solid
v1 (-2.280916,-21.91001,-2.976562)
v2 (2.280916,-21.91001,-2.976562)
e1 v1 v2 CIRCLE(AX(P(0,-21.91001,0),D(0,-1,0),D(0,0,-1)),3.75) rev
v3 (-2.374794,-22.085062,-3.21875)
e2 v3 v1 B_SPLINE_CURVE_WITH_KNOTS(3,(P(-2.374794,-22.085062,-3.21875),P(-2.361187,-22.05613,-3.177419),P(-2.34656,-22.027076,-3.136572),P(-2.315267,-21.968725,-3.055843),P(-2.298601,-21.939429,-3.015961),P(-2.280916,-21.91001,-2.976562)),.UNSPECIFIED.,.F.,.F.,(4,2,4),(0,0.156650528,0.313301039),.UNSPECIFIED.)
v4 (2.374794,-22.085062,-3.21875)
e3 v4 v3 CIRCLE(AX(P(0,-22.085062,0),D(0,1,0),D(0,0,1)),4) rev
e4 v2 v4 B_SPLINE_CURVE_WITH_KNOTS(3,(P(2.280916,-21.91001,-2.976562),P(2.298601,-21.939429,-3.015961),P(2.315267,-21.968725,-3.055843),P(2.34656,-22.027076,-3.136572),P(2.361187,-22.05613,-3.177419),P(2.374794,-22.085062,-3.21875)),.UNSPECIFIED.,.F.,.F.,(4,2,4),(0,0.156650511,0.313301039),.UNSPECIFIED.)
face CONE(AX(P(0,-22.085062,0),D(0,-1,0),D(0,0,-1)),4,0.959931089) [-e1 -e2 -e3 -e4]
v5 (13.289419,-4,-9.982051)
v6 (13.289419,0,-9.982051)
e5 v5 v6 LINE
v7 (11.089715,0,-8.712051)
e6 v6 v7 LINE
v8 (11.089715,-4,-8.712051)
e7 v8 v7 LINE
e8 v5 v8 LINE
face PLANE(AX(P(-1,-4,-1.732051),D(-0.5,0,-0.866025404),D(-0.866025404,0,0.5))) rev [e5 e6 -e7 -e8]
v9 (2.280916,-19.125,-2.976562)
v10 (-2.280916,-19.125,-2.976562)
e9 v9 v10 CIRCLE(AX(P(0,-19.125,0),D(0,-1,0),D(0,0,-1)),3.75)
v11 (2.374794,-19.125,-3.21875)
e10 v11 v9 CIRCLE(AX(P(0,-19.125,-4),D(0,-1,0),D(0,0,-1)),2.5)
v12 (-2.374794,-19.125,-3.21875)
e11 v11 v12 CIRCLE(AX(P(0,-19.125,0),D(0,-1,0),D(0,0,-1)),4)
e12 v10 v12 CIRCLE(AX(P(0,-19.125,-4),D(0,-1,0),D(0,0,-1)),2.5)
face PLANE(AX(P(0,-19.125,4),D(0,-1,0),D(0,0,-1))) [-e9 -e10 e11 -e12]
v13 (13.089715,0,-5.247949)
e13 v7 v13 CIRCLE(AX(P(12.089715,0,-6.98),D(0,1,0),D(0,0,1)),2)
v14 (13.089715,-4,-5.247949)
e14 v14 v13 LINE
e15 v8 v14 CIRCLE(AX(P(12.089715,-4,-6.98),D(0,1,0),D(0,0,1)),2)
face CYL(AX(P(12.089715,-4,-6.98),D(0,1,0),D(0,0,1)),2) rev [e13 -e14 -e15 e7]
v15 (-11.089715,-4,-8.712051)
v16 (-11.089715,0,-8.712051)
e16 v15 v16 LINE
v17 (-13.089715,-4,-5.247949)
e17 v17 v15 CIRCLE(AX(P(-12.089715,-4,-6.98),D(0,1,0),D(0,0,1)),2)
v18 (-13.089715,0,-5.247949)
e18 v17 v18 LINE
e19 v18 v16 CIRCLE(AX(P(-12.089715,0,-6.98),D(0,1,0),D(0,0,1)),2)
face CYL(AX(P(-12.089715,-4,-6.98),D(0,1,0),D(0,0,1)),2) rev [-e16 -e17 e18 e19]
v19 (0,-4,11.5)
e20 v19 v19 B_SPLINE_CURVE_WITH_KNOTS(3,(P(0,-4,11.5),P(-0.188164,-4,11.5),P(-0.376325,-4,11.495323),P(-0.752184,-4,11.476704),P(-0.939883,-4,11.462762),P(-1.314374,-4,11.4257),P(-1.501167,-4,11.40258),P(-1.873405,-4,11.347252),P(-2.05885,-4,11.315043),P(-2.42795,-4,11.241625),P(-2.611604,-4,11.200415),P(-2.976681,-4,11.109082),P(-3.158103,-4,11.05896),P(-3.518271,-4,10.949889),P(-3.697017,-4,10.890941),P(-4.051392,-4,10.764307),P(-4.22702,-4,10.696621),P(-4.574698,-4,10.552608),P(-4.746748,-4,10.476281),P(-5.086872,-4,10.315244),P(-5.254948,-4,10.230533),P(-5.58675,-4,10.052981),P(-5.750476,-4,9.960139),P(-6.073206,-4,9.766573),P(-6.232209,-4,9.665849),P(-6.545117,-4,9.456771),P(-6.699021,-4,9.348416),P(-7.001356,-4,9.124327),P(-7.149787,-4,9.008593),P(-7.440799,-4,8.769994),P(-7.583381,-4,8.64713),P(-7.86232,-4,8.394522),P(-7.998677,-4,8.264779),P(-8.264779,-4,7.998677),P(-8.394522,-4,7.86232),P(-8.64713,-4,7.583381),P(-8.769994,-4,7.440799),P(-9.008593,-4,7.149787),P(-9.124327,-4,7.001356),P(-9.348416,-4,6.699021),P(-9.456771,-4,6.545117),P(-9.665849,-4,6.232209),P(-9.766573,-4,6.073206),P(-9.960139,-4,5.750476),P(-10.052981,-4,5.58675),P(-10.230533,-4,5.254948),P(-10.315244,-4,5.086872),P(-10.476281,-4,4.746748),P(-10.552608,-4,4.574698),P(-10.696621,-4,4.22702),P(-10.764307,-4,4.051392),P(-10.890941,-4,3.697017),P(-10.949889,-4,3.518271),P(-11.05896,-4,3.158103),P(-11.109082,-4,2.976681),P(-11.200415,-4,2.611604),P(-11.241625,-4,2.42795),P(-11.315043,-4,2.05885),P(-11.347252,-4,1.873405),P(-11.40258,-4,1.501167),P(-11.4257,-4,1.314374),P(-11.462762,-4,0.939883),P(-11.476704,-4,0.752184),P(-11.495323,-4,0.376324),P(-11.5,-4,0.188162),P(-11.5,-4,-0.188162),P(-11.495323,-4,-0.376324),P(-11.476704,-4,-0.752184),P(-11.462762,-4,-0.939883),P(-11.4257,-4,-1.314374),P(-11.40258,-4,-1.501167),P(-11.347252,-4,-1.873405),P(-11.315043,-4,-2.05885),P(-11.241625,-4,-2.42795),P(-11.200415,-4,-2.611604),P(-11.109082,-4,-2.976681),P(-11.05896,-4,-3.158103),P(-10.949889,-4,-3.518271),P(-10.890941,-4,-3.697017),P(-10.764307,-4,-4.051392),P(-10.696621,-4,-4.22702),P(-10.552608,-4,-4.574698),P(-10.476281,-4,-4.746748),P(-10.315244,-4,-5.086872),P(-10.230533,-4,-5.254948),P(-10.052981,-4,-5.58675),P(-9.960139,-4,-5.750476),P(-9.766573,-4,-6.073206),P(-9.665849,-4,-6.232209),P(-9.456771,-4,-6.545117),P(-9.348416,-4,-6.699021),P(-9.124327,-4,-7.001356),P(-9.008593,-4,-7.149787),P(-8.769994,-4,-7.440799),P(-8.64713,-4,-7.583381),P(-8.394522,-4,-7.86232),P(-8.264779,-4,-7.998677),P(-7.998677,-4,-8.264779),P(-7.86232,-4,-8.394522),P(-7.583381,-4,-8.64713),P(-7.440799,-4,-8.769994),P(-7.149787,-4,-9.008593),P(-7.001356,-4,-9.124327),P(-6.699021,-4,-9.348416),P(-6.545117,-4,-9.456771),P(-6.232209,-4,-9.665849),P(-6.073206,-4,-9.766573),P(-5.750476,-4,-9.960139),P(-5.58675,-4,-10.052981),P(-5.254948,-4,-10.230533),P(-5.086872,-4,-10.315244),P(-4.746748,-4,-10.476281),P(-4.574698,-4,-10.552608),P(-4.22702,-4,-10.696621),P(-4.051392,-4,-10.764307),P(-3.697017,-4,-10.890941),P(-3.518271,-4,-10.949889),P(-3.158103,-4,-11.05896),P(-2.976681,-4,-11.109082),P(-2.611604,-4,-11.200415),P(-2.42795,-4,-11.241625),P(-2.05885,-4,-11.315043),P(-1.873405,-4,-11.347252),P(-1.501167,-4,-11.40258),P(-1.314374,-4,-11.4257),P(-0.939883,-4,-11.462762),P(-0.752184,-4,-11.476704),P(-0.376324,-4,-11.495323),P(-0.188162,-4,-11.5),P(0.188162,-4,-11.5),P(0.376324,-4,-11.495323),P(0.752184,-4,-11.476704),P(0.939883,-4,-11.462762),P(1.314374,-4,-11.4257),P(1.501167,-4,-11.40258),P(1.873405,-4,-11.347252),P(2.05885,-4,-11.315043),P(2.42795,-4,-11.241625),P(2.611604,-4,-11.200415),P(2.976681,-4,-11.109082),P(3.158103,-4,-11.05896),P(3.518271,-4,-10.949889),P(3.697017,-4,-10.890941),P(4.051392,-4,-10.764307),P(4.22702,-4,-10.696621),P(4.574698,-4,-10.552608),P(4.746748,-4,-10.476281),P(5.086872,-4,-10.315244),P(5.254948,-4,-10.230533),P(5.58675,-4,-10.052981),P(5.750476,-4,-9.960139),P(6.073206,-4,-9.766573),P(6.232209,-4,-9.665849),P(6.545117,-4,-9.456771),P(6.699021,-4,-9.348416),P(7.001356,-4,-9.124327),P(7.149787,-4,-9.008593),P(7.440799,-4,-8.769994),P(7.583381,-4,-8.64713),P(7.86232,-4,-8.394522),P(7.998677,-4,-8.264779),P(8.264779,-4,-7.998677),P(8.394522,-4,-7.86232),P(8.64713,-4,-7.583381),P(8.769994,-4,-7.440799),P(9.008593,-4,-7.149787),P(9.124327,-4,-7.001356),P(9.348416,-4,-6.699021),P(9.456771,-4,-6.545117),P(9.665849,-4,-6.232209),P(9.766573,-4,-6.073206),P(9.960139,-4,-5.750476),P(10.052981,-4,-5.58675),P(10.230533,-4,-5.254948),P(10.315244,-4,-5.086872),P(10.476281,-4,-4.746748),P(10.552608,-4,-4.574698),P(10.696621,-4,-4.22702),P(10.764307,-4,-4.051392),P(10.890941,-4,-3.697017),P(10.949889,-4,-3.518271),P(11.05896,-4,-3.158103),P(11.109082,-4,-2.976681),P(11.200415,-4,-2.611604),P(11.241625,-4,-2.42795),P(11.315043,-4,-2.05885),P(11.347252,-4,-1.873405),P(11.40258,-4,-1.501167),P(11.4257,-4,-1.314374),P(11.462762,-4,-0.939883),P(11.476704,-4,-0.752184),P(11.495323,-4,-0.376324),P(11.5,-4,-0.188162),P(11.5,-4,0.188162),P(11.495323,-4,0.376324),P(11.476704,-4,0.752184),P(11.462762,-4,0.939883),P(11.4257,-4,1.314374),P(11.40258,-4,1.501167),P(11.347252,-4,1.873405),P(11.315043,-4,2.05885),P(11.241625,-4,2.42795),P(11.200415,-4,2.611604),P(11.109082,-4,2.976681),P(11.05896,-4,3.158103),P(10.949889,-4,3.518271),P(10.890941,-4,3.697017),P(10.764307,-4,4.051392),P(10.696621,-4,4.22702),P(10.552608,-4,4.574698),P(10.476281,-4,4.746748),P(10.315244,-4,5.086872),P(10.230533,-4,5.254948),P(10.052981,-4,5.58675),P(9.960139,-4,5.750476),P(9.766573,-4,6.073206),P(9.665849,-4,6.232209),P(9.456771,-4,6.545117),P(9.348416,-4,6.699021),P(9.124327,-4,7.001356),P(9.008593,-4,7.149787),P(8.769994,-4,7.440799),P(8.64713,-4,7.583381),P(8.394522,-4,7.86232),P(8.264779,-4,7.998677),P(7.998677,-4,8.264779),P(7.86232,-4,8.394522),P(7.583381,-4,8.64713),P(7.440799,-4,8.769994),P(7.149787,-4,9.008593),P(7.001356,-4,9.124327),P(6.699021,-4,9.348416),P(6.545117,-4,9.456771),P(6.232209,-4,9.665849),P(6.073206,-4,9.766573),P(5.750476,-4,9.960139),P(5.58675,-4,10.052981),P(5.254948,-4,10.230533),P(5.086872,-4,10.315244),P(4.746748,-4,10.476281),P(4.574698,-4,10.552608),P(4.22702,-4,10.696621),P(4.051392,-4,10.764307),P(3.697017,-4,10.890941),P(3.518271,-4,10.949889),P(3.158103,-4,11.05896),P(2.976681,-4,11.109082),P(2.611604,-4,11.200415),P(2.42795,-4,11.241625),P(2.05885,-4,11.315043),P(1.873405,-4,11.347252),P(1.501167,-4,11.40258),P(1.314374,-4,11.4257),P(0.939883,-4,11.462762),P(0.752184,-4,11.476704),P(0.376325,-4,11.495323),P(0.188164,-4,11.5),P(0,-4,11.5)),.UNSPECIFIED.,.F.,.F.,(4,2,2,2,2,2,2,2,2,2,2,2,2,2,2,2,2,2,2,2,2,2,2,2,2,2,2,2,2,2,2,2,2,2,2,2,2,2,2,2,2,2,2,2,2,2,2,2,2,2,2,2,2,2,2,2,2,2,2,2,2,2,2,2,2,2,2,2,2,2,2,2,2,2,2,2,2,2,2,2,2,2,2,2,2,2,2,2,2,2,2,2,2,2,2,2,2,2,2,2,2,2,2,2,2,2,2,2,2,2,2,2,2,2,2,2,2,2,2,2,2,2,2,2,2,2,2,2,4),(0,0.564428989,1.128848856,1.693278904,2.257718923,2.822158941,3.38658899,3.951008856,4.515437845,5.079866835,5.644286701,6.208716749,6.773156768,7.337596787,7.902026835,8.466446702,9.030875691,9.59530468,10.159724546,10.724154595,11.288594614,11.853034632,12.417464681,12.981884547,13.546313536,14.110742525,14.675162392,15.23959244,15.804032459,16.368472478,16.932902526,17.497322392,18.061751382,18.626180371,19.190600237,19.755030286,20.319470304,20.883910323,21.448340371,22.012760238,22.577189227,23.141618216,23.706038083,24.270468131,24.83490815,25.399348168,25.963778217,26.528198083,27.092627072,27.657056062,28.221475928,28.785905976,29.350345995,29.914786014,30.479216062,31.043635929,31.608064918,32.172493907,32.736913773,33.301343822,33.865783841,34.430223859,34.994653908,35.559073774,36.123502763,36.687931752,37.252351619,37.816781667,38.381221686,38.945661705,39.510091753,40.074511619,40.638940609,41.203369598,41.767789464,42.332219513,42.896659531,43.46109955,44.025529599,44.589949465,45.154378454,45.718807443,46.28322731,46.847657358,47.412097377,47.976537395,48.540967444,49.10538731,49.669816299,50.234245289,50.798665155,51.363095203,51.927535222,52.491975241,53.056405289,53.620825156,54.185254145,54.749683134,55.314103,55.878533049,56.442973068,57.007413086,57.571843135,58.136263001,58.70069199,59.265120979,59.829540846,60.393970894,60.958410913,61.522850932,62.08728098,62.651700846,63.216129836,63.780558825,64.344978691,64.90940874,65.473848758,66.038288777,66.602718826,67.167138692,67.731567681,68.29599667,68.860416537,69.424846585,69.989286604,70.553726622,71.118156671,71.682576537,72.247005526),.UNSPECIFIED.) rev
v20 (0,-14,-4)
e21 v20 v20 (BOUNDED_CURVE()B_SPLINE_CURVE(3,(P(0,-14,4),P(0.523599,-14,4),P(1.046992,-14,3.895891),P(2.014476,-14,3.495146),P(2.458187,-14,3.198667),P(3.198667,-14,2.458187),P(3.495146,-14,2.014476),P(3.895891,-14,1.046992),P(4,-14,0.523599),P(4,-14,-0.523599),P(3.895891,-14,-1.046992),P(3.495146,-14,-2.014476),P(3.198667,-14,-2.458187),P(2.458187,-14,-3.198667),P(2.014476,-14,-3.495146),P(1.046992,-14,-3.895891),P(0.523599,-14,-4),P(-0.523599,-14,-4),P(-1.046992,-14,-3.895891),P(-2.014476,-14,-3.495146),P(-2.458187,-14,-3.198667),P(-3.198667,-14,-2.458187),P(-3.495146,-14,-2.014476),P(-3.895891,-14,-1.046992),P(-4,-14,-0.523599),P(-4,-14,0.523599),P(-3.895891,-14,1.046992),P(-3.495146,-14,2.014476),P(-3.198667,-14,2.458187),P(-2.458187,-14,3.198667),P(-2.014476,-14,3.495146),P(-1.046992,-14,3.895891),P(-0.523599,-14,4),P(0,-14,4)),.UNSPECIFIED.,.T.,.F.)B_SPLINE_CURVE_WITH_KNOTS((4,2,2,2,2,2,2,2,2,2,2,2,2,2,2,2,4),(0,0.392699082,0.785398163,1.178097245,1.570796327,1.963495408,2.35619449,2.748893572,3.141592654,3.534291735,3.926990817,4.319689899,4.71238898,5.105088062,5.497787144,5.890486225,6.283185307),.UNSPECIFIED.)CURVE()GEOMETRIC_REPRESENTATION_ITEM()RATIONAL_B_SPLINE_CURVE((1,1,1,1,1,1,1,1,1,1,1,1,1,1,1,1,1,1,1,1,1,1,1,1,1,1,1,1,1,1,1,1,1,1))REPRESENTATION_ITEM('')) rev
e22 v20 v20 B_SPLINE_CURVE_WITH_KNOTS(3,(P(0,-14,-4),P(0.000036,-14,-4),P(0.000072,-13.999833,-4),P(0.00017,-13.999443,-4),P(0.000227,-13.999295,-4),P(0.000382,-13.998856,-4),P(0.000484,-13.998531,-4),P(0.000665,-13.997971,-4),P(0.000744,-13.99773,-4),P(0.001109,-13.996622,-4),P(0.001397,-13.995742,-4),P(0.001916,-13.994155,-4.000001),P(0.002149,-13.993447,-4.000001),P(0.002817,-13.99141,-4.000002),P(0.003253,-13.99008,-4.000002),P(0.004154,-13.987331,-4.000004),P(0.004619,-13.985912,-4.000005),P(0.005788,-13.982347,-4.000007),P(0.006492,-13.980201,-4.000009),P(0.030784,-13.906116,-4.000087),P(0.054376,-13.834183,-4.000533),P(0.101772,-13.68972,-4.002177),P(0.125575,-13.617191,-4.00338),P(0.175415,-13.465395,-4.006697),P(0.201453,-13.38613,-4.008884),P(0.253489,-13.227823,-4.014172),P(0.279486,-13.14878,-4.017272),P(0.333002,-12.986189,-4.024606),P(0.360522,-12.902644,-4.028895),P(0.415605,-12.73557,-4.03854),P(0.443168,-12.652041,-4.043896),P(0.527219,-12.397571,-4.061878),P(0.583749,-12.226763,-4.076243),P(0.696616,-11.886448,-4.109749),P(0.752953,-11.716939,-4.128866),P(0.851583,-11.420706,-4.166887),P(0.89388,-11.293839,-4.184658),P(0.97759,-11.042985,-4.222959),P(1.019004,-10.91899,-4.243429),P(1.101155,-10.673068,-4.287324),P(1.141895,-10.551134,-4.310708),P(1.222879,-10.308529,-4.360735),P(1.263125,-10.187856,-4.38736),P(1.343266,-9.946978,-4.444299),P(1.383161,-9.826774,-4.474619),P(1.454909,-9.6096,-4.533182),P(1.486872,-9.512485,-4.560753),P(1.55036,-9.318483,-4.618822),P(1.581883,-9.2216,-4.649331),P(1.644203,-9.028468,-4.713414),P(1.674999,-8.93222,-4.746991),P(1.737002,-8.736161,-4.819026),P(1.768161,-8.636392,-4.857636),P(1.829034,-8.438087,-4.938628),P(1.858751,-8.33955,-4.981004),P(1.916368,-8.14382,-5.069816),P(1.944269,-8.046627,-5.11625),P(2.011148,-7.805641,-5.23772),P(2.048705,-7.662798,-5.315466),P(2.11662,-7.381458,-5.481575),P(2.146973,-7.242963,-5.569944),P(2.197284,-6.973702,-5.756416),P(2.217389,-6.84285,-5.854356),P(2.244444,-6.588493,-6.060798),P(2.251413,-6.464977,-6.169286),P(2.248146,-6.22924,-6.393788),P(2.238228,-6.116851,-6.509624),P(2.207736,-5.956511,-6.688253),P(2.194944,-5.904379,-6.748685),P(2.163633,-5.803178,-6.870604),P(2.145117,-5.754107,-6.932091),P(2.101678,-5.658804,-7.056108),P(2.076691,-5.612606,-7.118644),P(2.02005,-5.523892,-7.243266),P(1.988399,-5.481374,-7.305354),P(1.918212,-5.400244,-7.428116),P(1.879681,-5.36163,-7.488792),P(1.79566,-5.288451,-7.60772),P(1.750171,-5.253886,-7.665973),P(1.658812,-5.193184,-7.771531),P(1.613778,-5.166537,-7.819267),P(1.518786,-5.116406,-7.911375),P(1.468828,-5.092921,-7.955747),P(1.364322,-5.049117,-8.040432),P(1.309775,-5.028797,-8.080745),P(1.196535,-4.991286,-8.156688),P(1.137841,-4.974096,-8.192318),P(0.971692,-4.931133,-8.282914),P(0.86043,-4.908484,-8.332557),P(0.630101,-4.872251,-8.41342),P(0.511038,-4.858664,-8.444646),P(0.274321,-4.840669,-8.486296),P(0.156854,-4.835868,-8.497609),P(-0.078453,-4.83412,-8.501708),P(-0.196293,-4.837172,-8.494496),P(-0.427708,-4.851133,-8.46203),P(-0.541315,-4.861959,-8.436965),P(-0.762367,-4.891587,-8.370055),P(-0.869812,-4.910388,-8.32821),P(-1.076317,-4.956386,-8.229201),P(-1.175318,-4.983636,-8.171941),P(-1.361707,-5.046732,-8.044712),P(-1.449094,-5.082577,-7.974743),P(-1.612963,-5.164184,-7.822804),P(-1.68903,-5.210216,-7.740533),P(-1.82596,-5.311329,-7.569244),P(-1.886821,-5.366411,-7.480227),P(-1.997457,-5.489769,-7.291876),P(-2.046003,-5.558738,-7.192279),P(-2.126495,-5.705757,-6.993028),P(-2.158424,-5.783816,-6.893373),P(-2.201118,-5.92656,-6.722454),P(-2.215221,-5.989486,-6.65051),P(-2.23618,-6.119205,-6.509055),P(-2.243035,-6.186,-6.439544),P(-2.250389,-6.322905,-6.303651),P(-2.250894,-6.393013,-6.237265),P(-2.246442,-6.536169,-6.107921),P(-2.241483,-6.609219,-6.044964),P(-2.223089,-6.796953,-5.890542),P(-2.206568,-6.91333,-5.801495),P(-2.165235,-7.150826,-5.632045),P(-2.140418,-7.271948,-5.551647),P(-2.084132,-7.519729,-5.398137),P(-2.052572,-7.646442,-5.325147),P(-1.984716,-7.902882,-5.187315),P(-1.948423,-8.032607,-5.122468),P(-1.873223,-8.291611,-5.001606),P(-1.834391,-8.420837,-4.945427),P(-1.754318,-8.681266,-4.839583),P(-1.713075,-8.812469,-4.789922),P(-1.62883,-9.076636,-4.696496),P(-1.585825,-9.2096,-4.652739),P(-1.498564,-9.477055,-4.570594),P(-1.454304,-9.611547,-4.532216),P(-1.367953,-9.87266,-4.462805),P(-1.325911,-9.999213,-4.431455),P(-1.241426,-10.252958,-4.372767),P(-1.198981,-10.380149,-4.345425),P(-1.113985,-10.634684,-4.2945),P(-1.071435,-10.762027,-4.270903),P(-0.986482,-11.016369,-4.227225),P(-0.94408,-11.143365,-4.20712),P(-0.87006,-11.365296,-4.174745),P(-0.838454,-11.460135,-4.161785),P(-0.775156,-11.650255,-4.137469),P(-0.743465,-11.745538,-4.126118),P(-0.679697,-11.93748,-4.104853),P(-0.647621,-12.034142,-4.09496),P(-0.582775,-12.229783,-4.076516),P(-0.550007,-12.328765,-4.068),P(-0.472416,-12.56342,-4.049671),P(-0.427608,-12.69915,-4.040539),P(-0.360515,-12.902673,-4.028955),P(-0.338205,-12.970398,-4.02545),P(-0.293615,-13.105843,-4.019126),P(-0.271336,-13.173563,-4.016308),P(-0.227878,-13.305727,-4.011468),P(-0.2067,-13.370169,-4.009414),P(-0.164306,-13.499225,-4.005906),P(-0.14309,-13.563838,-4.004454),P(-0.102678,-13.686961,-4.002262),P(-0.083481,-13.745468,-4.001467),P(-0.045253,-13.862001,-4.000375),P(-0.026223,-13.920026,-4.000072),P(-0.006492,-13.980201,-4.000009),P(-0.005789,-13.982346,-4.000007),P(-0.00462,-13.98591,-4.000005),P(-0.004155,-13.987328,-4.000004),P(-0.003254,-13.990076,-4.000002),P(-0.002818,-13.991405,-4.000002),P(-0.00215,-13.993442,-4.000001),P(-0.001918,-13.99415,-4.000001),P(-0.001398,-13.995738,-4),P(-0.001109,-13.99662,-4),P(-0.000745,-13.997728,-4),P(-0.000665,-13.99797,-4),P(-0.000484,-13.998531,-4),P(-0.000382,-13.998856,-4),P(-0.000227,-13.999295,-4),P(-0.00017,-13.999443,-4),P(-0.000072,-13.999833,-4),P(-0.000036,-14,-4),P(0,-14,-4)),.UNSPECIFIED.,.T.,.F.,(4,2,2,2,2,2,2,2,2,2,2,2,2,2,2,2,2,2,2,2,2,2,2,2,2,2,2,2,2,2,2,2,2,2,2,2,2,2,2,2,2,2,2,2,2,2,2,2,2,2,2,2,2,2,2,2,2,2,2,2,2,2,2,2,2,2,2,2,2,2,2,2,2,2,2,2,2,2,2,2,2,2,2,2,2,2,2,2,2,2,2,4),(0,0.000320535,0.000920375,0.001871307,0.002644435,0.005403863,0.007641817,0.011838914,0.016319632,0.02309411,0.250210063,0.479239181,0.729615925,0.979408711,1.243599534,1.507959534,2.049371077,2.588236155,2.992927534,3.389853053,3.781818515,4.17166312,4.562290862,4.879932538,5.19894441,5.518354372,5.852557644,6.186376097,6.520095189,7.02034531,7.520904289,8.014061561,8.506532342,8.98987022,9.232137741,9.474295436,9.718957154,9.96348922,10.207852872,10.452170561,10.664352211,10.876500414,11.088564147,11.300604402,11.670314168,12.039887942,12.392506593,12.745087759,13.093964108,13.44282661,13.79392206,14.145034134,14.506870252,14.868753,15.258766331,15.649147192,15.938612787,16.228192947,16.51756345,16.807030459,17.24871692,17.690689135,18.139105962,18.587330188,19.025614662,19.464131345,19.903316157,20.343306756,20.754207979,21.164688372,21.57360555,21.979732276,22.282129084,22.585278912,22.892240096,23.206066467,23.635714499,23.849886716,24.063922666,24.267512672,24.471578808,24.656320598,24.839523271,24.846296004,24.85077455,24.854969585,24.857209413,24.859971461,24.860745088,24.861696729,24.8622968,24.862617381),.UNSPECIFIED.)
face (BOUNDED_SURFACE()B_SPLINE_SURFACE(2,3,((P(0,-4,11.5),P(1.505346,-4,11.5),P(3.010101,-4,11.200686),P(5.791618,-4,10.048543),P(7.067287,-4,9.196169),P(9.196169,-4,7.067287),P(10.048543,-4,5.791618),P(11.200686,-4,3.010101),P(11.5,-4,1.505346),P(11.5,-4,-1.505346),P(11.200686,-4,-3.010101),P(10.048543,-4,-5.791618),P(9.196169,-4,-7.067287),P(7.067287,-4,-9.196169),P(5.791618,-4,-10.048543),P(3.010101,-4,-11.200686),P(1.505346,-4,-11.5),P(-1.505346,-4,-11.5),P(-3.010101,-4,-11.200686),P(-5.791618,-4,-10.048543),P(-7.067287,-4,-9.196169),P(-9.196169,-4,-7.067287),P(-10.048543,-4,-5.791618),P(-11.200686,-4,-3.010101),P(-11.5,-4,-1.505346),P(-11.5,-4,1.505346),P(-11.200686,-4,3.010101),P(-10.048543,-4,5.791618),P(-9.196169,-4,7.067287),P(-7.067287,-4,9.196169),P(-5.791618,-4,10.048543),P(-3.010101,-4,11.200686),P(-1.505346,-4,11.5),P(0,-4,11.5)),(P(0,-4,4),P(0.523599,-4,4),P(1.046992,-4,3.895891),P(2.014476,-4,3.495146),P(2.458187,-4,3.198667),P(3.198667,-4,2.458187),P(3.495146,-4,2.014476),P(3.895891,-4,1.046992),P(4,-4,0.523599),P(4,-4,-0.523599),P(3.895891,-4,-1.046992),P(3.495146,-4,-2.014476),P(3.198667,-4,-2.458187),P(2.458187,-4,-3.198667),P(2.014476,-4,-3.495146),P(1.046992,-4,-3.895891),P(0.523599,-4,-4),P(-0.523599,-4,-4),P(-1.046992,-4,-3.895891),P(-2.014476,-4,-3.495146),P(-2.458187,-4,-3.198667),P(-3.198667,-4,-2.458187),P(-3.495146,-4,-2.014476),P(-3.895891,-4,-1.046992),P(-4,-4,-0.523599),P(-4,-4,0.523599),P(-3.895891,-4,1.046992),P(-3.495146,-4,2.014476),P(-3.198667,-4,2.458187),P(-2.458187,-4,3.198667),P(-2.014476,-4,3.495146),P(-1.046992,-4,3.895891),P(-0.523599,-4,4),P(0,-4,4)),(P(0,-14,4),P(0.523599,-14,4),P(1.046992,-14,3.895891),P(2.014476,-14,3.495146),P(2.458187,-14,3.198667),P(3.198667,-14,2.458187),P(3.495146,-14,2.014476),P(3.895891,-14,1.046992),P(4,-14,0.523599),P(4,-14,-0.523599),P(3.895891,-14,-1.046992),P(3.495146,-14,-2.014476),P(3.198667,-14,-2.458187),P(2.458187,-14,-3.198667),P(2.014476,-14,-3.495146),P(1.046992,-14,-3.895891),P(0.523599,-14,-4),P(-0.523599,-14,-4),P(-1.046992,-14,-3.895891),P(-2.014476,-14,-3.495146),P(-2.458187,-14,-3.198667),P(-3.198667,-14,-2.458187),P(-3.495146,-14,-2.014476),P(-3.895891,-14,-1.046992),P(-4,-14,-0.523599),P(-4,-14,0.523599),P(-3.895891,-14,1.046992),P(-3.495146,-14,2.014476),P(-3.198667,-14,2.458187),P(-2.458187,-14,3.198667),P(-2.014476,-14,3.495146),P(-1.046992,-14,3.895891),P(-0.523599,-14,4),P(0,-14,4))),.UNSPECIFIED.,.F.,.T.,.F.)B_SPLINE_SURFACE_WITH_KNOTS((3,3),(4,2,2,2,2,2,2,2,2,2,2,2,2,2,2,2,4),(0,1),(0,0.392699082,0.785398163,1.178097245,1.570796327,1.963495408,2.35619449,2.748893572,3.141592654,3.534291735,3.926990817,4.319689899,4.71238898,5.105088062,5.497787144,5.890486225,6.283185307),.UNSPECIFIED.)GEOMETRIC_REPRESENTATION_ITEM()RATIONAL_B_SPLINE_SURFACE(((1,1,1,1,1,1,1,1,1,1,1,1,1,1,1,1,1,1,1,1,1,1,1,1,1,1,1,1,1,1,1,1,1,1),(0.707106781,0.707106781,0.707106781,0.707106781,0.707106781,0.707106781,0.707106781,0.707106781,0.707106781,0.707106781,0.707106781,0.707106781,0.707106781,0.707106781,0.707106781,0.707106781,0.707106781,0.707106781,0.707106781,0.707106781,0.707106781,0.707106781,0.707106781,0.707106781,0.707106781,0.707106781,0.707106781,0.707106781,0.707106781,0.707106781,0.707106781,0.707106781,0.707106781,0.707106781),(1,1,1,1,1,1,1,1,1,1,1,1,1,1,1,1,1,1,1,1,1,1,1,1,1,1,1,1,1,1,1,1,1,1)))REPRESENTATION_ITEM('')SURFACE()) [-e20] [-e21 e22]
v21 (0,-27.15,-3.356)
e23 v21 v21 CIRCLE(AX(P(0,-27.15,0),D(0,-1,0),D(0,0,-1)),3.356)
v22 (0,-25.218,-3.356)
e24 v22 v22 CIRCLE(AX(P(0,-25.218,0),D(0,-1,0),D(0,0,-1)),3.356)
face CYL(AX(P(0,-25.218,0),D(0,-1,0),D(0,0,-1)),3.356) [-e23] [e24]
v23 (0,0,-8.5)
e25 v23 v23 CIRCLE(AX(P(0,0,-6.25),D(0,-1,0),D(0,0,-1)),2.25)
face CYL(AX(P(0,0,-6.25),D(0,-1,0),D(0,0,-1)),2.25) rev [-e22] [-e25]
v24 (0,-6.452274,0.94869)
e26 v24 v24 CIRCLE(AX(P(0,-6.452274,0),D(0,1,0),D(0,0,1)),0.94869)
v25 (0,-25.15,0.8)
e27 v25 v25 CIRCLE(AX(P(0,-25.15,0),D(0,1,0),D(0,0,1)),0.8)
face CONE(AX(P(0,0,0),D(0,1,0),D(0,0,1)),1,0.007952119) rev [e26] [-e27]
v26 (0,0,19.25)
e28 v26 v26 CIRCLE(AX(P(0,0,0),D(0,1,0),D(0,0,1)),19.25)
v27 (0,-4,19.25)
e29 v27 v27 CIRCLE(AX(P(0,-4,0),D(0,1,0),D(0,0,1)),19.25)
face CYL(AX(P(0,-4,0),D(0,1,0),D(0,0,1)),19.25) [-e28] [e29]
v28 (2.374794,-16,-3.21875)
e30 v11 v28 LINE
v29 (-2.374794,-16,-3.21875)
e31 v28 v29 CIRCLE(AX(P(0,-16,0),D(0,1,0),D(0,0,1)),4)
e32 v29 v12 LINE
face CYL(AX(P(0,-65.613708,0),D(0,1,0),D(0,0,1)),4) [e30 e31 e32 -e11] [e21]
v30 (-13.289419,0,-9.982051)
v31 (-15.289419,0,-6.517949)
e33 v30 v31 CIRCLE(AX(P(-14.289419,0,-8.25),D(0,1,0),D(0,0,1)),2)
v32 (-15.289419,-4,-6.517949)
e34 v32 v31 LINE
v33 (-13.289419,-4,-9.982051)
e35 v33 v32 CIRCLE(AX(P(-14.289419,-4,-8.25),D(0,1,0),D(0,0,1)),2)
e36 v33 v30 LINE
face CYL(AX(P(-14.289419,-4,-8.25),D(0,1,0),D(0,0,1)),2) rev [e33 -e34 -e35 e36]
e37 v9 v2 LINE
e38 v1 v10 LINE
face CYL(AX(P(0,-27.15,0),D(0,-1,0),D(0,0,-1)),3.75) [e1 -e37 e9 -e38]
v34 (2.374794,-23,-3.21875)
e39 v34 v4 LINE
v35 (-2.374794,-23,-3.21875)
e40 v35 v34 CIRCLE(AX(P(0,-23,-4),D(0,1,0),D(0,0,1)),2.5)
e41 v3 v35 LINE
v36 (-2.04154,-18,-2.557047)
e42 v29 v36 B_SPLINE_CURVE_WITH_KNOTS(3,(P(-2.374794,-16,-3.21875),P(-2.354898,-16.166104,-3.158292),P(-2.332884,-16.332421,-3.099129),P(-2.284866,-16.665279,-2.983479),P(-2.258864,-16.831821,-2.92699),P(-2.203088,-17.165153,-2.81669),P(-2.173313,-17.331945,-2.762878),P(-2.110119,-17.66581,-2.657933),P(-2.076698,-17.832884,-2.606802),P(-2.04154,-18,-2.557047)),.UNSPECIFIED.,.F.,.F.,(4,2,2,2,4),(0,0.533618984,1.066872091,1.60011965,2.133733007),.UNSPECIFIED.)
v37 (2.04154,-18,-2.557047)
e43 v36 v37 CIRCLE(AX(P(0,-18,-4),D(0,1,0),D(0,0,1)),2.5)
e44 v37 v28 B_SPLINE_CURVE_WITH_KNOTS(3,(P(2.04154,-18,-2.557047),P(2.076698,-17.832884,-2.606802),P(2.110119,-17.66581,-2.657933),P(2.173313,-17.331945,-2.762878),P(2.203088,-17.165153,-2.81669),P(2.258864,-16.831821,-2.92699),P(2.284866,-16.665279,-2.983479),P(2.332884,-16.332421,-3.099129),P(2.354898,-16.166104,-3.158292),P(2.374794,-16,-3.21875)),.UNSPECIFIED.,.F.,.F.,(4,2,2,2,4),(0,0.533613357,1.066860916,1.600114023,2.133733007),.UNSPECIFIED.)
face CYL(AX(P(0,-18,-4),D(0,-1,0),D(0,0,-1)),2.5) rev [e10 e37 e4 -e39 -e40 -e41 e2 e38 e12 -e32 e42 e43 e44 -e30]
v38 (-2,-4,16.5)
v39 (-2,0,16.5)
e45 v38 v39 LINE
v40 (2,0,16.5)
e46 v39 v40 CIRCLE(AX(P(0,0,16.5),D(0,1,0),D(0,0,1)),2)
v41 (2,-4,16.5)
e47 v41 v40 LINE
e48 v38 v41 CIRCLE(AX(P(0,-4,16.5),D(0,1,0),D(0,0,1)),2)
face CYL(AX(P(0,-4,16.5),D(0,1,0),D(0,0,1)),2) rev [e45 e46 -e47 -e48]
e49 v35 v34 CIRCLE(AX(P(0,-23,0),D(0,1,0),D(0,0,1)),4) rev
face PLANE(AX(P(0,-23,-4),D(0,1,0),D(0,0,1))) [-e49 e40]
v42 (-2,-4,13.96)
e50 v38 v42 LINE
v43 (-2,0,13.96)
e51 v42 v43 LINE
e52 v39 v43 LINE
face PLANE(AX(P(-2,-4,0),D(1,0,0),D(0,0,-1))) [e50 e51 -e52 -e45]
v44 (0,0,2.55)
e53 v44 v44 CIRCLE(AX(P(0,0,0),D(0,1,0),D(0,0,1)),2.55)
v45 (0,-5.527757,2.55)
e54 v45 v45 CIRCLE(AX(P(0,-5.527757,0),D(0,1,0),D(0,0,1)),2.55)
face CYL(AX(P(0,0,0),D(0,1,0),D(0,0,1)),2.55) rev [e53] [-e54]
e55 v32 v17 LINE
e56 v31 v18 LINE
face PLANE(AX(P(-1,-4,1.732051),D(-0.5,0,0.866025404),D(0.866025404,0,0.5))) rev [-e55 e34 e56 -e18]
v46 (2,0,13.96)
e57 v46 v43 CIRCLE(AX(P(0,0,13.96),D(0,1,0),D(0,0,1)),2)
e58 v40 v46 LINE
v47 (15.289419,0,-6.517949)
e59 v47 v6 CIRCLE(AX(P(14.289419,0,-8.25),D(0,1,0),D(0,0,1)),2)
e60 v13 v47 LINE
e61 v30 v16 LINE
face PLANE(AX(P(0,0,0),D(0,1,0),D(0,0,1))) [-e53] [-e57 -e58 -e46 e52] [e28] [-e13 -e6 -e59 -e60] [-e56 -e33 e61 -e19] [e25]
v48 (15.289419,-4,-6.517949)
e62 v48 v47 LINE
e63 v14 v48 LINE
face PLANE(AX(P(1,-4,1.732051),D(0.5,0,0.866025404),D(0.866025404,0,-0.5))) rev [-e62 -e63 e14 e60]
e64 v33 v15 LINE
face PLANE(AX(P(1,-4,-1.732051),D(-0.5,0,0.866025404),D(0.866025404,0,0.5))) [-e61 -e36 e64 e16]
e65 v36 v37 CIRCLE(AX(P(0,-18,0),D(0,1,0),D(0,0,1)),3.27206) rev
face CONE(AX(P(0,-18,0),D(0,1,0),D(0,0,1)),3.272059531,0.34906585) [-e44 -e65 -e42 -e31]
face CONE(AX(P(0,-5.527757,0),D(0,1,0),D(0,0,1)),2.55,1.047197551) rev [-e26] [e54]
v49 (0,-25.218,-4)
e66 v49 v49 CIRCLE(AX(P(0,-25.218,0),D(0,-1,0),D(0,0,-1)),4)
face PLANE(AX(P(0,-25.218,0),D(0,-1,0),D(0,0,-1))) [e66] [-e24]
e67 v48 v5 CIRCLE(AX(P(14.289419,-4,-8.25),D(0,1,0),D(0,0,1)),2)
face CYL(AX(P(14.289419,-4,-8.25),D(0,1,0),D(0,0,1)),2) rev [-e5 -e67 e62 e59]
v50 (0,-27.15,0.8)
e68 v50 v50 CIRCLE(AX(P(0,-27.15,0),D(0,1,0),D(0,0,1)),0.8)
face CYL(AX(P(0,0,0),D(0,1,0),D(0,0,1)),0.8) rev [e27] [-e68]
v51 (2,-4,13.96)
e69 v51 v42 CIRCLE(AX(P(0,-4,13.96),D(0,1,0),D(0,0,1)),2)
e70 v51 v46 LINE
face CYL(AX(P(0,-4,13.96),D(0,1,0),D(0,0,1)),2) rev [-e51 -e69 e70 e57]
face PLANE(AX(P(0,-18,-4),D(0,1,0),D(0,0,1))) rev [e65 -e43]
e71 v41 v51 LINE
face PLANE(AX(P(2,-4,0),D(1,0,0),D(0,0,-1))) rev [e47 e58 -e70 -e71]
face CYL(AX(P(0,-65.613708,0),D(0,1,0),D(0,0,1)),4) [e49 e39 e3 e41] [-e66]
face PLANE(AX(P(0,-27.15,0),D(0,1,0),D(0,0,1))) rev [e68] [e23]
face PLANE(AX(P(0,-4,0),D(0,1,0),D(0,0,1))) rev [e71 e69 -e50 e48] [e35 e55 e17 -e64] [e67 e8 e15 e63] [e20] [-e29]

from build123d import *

# Parameters (mm, degrees)
SKETCH1_R               = 19.25
SKETCH1_R_2             = 4
BOSS_EXTRUDE1_DEPTH     = 4
SKETCH1_4_R             = 4
BOSS_EXTRUDE2_DEPTH     = 27.15
CUT_EXTRUDE1_START      = -1.932
SKETCH6_R               = 4
SKETCH6_R_2             = 3.356
CUT_EXTRUDE1_DEPTH      = 1.932
SKETCH8_R               = 2.5
CUT_EXTRUDE3_DEPTH      = 5
CHAMFER1_SIZE           = 2
CHAMFER1_SIZE2          = 0.727940469
SKETCH9_W               = 0.25
SKETCH9_H               = 2.75
CHAMFER3_SIZE           = 0.3
CHAMFER3_SIZE_2         = 0.210062261
FILLET3_SIZE            = 10
FILLET3_SIZE_2          = 7.5
CUT_EXTRUDE2_DEPTH      = 36.735801376
CUT_EXTRUDE2_DEPTH_BACK = 36.735801376
SKETCH7_R               = 2.25


with BuildPart() as part:
    # Sketch1 → Boss-Extrude1 (new body)
    # profile 1 of 2: a face of its own
    with BuildSketch(Plane(origin=(0, 0, 0), x_dir=(1, 0, 0), z_dir=(0, 1, 0))):
        with Locations(Location((0, 0, 0), (0, 0, 270))):
            Circle(SKETCH1_R)
        with BuildLine():
            ThreePointArc((2, -16.5), (0, -18.5), (-2, -16.5))
            Line((-2, -16.5), (-2, -16.378339354))
            ThreePointArc((-2, -16.378339354), (-14.289419162, -8.25), (-15.184057953, 6.45711887))
            Line((-15.184057953, 6.45711887), (-15.289419162, 6.517949192))
            ThreePointArc((-15.289419162, 6.517949192), (-16.02146997, 9.25), (-13.289419162, 9.982050808))
            Line((-13.289419162, 9.982050808), (-13.184057953, 9.921220485))
            ThreePointArc((-13.184057953, 9.921220485), (0, 16.5), (13.184057953, 9.921220485))
            Line((13.184057953, 9.921220485), (13.289419162, 9.982050808))
            ThreePointArc((13.289419162, 9.982050808), (16.02146997, 9.25), (15.289419162, 6.517949192))
            Line((15.289419162, 6.517949192), (15.184057953, 6.45711887))
            ThreePointArc((15.184057953, 6.45711887), (16.167667677, 3.294923655), (16.5, 0))
            ThreePointArc((16.5, 0), (12.354149101, -10.937321427), (2, -16.378339354))
            Line((2, -16.378339354), (2, -16.5))
        make_face(mode=Mode.SUBTRACT)
    # profile 2 of 2: a face of its own
    with BuildSketch(Plane(origin=(0, 0, 0), x_dir=(1, 0, 0), z_dir=(0, 1, 0))):
        with BuildLine():
            ThreePointArc((-15.184057953, 6.45711887), (-14.289419162, -8.25), (-2, -16.378339354))
            Line((-2, -16.378339354), (-2, -13.96))
            ThreePointArc((-2, -13.96), (0, -11.96), (2, -13.96))
            Line((2, -13.96), (2, -16.378339354))
            ThreePointArc((2, -16.378339354), (12.354149101, -10.937321427), (16.5, 0))
            ThreePointArc((16.5, 0), (16.167667677, 3.294923655), (15.184057953, 6.45711887))
            Line((15.184057953, 6.45711887), (13.089714637, 5.247949192))
            ThreePointArc((13.089714637, 5.247949192), (10.357663829, 5.98), (11.089714637, 8.712050808))
            Line((11.089714637, 8.712050808), (13.184057953, 9.921220485))
            ThreePointArc((13.184057953, 9.921220485), (0, 16.5), (-13.184057953, 9.921220485))
            Line((-13.184057953, 9.921220485), (-11.094979939, 8.715090731))
            Line((-11.094979939, 8.715090731), (-11.089714637, 8.712050808))
            ThreePointArc((-11.089714637, 8.712050808), (-10.357663829, 5.98), (-13.089714637, 5.247949192))
            Line((-13.089714637, 5.247949192), (-15.184057953, 6.45711887))
        make_face()
        with Locations(Location((0, 0, 0), (0, 0, 270))):
            Circle(SKETCH1_R_2, mode=Mode.SUBTRACT)
    extrude(amount=-BOSS_EXTRUDE1_DEPTH)

    # Sketch1<4> → Boss-Extrude2 (add)
    with BuildSketch(Plane(origin=(0, 0, 0), x_dir=(1, 0, 0), z_dir=(0, 1, 0))):
        with Locations(Location((0, 0, 0), (0, 0, 270))):
            Circle(SKETCH1_4_R)
    extrude(amount=-BOSS_EXTRUDE2_DEPTH)

    # Sketch2 → Cut-Revolve4 (revolve, cut)
    with BuildSketch(Plane(origin=(0, 0, 0), x_dir=(0, 0, -1), z_dir=(1, 0, 0)), mode=Mode.PRIVATE) as cut_revolve4_sk:
        Polygon((0, -27.15), (0.8, -27.15), (0.8, -25.15), (1, 0), (0, 0), align=None)
    revolve(cut_revolve4_sk.sketch.rotate(Axis((0, 0, 0), (0, -1, 0)), 180), axis=Axis((0, 0, 0), (0, -1, 0)), mode=Mode.SUBTRACT)

    # Sketch5 → Cut-Revolve8 (revolve, cut)
    with BuildSketch(Plane.XY, mode=Mode.PRIVATE) as cut_revolve8_sk:
        Polygon((0, -7), (-2.55, -5.527756814), (-2.55, 0), (0, 0), align=None)
    revolve(cut_revolve8_sk.sketch.rotate(Axis((0, 0, 0), (0, -1, 0)), 270), axis=Axis((0, 0, 0), (0, -1, 0)), mode=Mode.SUBTRACT)

    # Sketch6 → Cut-Extrude1 (cut)
    with BuildSketch(Plane.XZ.offset(27.15).offset(CUT_EXTRUDE1_START)):
        with Locations(Location((0, 0, 0), (0, 0, 90))):
            Circle(SKETCH6_R)
        with Locations(Location((0, 0, 0), (0, 0, 270))):
            Circle(SKETCH6_R_2, mode=Mode.SUBTRACT)
    extrude(amount=CUT_EXTRUDE1_DEPTH, mode=Mode.SUBTRACT)

    # Sketch8 → Cut-Extrude3 (cut)
    with BuildSketch(Plane(origin=(0, -23, 0), x_dir=(1, 0, 0), z_dir=(0, 1, 0))):
        with Locations((0, 4)):
            Circle(SKETCH8_R)
    extrude(amount=CUT_EXTRUDE3_DEPTH, mode=Mode.SUBTRACT)

    # Chamfer1
    chamfer1_edges = [part.edges().sort_by_distance(p)[0] for p in [
        (0, -18, -4),
    ]]
    chamfer1_side = [part.faces().sort_by_distance(p)[0] for p in [
        (0, -14.609, -4),
    ]]
    chamfer(chamfer1_edges, length=CHAMFER1_SIZE, length2=CHAMFER1_SIZE2, reference=chamfer1_side[0])

    # Sketch9 → Cut-Revolve9 (revolve, cut)
    with BuildSketch(Plane(origin=(0, 0, 0), x_dir=(0, 0, -1), z_dir=(1, 0, 0)), mode=Mode.PRIVATE) as cut_revolve9_sk:
        with Locations((-3.875, -20.5)):
            Rectangle(SKETCH9_W, SKETCH9_H)
    revolve(cut_revolve9_sk.sketch.rotate(Axis((0, -27.15, 0), (0, 1, 0)), 143.580086271), axis=Axis((0, -27.15, 0), (0, 1, 0)), mode=Mode.SUBTRACT)

    # Chamfer3
    # the kernel refuses this chamfer: 0.3, 0.210062261 mm, written as the material it takes off along each edge
    with BuildSketch(Plane(origin=(0, -21.875, 0), x_dir=(-0.42752924874280274, 0, -0.9040015162981834), z_dir=(0.9040015162981834, 0, -0.42752924874280274))) as chamfer3_piece_1_section:
        Polygon((4 - CHAMFER3_SIZE, 0), (4, -CHAMFER3_SIZE_2 * 1.0000000022), (4, 0), align=None)
    chamfer3_piece_1 = revolve(axis=Axis((0, -21.875, 0), (0, 1, 0)), revolution_arc=154.689138052, mode=Mode.PRIVATE)
    chamfer3_piece_1 = chamfer3_piece_1 - Plane(origin=(0, -21.995167344, 0), x_dir=(0.593698599754949, 0, -0.8046874999955033), z_dir=(0, -1, 0)) * Cylinder(3.75, 16, mode=Mode.PRIVATE)
    add(chamfer3_piece_1, mode=Mode.SUBTRACT)
    with BuildSketch(Plane(origin=(0, -21.875, 0), x_dir=(0, 0, 1), z_dir=(-1, 0, 0))) as chamfer3_piece_2_section:
        Polygon((4 - CHAMFER3_SIZE, 0), (4, -CHAMFER3_SIZE_2 * 1.0000000022), (4, 0), align=None)
    chamfer3_piece_2 = revolve(axis=Axis((0, -21.875, 0), (0, 1, 0)), revolution_arc=154.689138052, mode=Mode.PRIVATE)
    chamfer3_piece_2 = chamfer3_piece_2 - Plane(origin=(0, -21.995167344, 0), x_dir=(0.593698599754949, 0, -0.8046874999955033), z_dir=(0, -1, 0)) * Cylinder(3.75, 16, mode=Mode.PRIVATE)
    add(chamfer3_piece_2, mode=Mode.SUBTRACT)

    # Fillet3
    # an asymmetric fillet: 10, 7.5 mm, written as the material it adds along each edge
    with BuildSketch(Plane(origin=(0, -4, 0), x_dir=(0, 0, 1), z_dir=(-1, 0, 0))) as fillet3_piece_1:
        with BuildLine():
            Bezier((4, -FILLET3_SIZE), (4, 0), (4 + FILLET3_SIZE_2, 0), weights=[1, 0.707106781, 1])
            Line((4 + FILLET3_SIZE_2, 0), (4, 0))
            Line((4, 0), (4, -FILLET3_SIZE))
        make_face()
    revolve(axis=Axis((0, -4, 0), (0, 1, 0)))

    # Sketch7 → Cut-Extrude2 (cut, two sides: drawn at the far end of the back side and taken through both)
    with BuildSketch(Plane.XZ.offset(4).offset(-CUT_EXTRUDE2_DEPTH_BACK)):
        with Locations(Location((0, -6.25, 0), (0, 0, 270))):
            Circle(SKETCH7_R)
    extrude(amount=CUT_EXTRUDE2_DEPTH + CUT_EXTRUDE2_DEPTH_BACK, mode=Mode.SUBTRACT)


solid = part.part
